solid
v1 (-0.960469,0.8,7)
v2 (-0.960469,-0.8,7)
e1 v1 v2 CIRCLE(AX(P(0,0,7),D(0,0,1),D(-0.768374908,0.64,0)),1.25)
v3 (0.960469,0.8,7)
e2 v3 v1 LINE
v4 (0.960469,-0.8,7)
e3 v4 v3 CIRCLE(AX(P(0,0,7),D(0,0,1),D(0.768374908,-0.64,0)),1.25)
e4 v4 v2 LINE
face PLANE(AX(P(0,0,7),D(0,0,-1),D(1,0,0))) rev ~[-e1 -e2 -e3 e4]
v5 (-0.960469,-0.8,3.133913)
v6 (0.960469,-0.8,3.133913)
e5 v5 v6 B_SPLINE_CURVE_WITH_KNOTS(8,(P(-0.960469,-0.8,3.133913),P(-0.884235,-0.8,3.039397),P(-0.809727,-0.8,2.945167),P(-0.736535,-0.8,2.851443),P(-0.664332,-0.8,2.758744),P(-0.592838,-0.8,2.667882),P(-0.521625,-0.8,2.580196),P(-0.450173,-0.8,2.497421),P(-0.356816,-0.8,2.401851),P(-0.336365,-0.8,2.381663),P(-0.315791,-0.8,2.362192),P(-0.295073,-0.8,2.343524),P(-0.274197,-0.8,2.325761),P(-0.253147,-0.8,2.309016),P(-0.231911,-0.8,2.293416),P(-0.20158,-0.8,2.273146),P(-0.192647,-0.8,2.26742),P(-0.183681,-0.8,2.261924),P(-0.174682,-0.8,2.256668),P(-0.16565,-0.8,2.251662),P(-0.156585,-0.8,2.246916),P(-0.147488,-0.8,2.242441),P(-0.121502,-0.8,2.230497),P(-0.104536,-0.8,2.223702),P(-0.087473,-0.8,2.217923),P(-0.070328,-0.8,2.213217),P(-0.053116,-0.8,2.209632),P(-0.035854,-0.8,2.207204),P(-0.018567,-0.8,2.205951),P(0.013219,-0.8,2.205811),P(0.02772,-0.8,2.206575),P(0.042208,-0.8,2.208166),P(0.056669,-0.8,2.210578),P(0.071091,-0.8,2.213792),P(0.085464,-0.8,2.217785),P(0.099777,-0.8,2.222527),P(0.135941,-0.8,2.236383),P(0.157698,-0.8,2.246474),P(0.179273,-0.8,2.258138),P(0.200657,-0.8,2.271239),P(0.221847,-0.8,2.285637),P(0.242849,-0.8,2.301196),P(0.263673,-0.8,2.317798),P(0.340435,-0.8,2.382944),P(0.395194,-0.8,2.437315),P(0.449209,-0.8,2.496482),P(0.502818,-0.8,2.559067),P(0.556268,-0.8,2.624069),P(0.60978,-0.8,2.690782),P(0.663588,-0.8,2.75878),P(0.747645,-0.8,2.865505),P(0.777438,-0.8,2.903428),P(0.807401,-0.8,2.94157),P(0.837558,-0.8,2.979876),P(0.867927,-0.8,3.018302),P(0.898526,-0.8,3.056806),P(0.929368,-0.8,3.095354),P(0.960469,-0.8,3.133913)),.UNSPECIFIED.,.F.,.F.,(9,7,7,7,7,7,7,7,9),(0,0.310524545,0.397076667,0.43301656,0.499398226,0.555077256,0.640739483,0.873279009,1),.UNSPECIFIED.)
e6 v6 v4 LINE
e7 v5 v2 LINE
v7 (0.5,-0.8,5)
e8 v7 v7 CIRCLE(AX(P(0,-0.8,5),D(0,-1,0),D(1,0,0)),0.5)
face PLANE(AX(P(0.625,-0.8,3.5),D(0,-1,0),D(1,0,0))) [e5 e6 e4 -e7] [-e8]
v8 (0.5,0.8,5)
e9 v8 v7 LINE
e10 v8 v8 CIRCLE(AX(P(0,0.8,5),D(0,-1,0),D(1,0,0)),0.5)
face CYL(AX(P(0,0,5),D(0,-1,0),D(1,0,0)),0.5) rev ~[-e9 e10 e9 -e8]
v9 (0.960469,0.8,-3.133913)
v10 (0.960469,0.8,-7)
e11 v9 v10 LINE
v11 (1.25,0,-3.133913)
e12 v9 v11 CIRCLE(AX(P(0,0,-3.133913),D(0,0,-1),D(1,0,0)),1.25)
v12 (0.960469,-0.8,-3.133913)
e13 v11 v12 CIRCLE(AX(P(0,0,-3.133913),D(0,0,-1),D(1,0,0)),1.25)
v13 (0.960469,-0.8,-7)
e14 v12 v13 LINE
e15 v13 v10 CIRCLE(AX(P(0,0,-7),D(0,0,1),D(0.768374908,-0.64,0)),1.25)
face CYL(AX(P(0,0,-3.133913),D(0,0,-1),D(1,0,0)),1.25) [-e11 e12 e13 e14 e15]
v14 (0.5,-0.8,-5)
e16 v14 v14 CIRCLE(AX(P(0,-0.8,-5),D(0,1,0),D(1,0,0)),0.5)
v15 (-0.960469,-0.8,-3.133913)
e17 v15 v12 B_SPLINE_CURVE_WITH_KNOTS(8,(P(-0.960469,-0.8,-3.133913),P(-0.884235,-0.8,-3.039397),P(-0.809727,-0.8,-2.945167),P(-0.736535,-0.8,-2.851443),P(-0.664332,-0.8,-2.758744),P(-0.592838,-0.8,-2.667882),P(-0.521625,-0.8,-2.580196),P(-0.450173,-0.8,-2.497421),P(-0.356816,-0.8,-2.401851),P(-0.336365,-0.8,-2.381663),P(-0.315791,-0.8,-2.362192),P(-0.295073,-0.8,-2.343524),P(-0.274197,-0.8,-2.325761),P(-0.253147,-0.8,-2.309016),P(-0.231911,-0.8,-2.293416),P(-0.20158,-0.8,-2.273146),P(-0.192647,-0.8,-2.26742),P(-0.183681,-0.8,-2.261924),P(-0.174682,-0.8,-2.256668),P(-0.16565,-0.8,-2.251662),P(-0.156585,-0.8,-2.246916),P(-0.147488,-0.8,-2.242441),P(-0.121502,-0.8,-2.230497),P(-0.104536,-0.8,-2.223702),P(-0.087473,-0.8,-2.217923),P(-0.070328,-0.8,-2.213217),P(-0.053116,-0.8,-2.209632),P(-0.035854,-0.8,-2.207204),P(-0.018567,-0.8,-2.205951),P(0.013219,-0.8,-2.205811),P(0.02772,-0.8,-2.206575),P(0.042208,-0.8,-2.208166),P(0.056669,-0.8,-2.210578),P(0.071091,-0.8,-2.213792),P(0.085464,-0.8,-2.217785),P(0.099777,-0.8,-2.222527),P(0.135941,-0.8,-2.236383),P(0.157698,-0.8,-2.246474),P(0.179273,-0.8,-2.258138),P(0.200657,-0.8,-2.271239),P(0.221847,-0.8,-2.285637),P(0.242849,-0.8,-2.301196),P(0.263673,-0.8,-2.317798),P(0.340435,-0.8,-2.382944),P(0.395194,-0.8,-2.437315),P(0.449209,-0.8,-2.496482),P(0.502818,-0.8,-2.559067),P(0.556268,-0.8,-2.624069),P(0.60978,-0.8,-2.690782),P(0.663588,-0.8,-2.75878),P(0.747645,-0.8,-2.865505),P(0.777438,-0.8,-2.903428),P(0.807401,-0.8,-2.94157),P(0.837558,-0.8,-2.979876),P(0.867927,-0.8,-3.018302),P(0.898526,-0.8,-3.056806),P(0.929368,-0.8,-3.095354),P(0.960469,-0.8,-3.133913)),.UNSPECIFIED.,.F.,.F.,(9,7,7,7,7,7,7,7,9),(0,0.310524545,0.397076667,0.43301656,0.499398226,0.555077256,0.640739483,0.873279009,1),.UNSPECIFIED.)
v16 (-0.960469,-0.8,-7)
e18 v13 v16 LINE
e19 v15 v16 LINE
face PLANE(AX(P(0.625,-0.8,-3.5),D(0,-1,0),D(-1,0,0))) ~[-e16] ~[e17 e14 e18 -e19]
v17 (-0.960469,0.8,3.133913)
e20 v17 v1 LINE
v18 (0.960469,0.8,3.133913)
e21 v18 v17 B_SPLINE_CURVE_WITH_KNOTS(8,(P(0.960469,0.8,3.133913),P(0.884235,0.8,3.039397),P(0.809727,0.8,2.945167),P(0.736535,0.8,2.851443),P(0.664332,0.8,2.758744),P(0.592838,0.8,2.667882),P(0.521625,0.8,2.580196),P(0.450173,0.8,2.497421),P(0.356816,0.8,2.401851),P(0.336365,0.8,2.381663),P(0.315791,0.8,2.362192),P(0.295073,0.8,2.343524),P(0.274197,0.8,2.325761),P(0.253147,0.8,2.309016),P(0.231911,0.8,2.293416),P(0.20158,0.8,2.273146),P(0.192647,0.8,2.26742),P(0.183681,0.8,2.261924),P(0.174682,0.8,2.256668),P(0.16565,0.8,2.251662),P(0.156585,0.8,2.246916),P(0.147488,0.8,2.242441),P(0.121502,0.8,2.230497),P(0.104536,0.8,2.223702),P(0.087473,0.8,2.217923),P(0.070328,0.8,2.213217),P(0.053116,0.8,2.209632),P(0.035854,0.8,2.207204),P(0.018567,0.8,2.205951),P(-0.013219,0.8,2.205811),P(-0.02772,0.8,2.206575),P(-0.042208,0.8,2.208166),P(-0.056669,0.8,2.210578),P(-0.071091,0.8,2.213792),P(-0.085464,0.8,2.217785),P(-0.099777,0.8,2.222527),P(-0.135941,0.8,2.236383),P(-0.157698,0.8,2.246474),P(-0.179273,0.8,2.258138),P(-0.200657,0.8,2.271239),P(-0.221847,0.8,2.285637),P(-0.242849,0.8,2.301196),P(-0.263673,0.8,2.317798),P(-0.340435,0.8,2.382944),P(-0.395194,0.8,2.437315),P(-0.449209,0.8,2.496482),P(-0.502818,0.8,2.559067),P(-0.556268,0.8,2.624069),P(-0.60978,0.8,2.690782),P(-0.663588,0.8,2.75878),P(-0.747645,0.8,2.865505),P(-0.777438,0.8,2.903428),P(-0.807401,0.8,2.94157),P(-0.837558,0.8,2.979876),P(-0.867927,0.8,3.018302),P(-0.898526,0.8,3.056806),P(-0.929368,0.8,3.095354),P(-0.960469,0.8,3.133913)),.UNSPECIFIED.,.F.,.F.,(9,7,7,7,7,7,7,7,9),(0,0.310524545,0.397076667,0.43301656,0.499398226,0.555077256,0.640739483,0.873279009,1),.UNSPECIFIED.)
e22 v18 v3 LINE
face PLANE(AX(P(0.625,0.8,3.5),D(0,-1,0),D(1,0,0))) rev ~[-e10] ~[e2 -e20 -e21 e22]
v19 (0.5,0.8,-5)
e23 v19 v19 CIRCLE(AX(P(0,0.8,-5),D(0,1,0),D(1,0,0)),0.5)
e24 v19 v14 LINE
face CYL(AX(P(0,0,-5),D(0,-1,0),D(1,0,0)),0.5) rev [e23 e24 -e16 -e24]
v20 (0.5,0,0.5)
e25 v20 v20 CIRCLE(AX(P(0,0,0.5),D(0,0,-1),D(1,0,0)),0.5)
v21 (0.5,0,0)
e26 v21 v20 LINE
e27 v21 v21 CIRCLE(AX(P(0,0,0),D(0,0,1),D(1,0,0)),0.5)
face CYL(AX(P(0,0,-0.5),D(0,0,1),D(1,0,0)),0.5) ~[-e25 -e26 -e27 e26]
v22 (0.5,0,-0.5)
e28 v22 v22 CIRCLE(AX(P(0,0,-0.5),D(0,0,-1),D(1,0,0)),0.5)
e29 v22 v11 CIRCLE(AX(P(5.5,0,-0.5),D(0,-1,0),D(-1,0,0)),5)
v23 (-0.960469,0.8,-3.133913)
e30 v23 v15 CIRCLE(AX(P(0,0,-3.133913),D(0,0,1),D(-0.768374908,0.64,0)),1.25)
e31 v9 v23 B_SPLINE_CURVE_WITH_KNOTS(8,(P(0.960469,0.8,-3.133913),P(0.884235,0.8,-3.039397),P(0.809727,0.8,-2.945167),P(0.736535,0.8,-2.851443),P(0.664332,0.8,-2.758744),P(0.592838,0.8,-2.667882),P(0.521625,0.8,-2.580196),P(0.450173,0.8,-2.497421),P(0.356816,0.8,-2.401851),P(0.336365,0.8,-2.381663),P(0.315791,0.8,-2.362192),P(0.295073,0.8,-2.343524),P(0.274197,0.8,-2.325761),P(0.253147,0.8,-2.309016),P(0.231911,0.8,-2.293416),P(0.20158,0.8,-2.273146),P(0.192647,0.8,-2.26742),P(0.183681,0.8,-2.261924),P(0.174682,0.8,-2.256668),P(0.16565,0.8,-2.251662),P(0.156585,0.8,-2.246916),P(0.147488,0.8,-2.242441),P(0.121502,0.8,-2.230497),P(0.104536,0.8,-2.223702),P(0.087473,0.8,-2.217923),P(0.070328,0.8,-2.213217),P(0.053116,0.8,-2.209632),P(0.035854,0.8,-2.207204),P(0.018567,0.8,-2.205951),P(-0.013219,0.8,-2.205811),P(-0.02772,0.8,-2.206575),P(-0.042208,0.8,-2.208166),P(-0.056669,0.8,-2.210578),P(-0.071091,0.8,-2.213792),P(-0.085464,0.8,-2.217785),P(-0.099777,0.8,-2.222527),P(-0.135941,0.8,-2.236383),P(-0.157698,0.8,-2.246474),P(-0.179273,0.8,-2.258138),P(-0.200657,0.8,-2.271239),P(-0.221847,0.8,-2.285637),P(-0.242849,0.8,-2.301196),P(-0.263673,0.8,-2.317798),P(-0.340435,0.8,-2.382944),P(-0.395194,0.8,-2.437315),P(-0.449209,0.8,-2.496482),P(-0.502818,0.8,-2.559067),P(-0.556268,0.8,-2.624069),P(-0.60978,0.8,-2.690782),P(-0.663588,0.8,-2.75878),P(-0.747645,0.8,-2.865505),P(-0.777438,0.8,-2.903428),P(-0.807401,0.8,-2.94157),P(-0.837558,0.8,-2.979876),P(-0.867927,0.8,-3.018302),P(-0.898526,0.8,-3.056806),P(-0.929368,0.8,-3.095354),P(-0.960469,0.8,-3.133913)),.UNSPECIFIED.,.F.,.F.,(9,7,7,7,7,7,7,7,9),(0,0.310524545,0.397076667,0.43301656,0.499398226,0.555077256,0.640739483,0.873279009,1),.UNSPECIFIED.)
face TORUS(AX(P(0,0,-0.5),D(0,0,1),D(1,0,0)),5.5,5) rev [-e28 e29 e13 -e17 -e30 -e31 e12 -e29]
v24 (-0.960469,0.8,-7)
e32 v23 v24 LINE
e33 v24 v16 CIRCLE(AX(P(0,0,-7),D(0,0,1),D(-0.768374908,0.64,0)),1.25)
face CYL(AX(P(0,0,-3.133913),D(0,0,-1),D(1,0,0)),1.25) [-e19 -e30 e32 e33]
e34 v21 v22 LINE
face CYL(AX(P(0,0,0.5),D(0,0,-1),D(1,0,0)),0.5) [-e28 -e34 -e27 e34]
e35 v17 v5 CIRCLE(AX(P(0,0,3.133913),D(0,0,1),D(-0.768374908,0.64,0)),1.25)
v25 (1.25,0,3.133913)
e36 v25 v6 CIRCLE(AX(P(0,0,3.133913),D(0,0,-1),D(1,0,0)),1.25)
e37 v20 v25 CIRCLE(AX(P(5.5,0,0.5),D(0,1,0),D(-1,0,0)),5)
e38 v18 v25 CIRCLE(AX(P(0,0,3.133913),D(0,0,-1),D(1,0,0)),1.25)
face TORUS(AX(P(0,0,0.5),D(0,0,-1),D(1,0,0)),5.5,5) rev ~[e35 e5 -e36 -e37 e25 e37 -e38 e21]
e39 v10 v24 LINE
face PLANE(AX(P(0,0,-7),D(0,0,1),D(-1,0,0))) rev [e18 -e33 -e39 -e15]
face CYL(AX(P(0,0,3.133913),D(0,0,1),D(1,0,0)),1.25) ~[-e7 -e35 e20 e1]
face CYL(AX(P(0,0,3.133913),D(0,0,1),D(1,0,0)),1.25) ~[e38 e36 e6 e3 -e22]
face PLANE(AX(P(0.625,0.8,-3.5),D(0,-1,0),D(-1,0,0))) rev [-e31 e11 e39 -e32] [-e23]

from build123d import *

# Parameters (mm, degrees)
F2_W     = 1.25
F2_H     = 7
F3_DEPTH = 0.8
F4_R     = 0.5
F5_DEPTH = 12.5


# Not quite as in the source:
# - a feature names something its author has since deleted; it is built from what else it names


with BuildPart() as f1:
    # F0 (on Front) → F1 (revolve)
    with BuildSketch(Plane.XZ):
        with BuildLine():
            Line((1.25, 7), (0, 7))
            Line((0, 7), (0, 0))
            Line((0, 0), (0, -7))
            Line((0, -7), (1.25, -7))
            Line((1.25, -7), (1.25, -3.1339134382))
            ThreePointArc((1.25, -3.1339134382), (0.6911539846, -1.8693063938), (0.5, -0.5))
            Line((0.5, -0.5), (0.5, 0.5))
            ThreePointArc((0.5, 0.5), (0.6911539846, 1.8693063938), (1.25, 3.1339134382))
            Line((1.25, 3.1339134382), (1.25, 7))
        make_face()
    revolve(axis=Axis((0, 0, 3.5), (0, 0, -1)))

    # F2 (on Front) → F3 (intersect, symmetric)
    with BuildSketch(Plane.XZ):
        with Locations((0.625, 3.5)):
            Rectangle(F2_W, F2_H)
        with Locations((-0.625, 3.5)):
            Rectangle(F2_W, F2_H)
    extrude(amount=F3_DEPTH, both=True, mode=Mode.INTERSECT)

    # F4 (on Front) → F5 (cut, symmetric)
    with BuildSketch(Plane.XZ):
        with Locations((0, 5)):
            Circle(F4_R)
    extrude(amount=F5_DEPTH, both=True, mode=Mode.SUBTRACT)

    # F6: F1 across plane


with BuildPart() as f1_1:
    add(f1.part)
    add(f1.part.mirror(Plane.XY))


solid = f1_1.part
